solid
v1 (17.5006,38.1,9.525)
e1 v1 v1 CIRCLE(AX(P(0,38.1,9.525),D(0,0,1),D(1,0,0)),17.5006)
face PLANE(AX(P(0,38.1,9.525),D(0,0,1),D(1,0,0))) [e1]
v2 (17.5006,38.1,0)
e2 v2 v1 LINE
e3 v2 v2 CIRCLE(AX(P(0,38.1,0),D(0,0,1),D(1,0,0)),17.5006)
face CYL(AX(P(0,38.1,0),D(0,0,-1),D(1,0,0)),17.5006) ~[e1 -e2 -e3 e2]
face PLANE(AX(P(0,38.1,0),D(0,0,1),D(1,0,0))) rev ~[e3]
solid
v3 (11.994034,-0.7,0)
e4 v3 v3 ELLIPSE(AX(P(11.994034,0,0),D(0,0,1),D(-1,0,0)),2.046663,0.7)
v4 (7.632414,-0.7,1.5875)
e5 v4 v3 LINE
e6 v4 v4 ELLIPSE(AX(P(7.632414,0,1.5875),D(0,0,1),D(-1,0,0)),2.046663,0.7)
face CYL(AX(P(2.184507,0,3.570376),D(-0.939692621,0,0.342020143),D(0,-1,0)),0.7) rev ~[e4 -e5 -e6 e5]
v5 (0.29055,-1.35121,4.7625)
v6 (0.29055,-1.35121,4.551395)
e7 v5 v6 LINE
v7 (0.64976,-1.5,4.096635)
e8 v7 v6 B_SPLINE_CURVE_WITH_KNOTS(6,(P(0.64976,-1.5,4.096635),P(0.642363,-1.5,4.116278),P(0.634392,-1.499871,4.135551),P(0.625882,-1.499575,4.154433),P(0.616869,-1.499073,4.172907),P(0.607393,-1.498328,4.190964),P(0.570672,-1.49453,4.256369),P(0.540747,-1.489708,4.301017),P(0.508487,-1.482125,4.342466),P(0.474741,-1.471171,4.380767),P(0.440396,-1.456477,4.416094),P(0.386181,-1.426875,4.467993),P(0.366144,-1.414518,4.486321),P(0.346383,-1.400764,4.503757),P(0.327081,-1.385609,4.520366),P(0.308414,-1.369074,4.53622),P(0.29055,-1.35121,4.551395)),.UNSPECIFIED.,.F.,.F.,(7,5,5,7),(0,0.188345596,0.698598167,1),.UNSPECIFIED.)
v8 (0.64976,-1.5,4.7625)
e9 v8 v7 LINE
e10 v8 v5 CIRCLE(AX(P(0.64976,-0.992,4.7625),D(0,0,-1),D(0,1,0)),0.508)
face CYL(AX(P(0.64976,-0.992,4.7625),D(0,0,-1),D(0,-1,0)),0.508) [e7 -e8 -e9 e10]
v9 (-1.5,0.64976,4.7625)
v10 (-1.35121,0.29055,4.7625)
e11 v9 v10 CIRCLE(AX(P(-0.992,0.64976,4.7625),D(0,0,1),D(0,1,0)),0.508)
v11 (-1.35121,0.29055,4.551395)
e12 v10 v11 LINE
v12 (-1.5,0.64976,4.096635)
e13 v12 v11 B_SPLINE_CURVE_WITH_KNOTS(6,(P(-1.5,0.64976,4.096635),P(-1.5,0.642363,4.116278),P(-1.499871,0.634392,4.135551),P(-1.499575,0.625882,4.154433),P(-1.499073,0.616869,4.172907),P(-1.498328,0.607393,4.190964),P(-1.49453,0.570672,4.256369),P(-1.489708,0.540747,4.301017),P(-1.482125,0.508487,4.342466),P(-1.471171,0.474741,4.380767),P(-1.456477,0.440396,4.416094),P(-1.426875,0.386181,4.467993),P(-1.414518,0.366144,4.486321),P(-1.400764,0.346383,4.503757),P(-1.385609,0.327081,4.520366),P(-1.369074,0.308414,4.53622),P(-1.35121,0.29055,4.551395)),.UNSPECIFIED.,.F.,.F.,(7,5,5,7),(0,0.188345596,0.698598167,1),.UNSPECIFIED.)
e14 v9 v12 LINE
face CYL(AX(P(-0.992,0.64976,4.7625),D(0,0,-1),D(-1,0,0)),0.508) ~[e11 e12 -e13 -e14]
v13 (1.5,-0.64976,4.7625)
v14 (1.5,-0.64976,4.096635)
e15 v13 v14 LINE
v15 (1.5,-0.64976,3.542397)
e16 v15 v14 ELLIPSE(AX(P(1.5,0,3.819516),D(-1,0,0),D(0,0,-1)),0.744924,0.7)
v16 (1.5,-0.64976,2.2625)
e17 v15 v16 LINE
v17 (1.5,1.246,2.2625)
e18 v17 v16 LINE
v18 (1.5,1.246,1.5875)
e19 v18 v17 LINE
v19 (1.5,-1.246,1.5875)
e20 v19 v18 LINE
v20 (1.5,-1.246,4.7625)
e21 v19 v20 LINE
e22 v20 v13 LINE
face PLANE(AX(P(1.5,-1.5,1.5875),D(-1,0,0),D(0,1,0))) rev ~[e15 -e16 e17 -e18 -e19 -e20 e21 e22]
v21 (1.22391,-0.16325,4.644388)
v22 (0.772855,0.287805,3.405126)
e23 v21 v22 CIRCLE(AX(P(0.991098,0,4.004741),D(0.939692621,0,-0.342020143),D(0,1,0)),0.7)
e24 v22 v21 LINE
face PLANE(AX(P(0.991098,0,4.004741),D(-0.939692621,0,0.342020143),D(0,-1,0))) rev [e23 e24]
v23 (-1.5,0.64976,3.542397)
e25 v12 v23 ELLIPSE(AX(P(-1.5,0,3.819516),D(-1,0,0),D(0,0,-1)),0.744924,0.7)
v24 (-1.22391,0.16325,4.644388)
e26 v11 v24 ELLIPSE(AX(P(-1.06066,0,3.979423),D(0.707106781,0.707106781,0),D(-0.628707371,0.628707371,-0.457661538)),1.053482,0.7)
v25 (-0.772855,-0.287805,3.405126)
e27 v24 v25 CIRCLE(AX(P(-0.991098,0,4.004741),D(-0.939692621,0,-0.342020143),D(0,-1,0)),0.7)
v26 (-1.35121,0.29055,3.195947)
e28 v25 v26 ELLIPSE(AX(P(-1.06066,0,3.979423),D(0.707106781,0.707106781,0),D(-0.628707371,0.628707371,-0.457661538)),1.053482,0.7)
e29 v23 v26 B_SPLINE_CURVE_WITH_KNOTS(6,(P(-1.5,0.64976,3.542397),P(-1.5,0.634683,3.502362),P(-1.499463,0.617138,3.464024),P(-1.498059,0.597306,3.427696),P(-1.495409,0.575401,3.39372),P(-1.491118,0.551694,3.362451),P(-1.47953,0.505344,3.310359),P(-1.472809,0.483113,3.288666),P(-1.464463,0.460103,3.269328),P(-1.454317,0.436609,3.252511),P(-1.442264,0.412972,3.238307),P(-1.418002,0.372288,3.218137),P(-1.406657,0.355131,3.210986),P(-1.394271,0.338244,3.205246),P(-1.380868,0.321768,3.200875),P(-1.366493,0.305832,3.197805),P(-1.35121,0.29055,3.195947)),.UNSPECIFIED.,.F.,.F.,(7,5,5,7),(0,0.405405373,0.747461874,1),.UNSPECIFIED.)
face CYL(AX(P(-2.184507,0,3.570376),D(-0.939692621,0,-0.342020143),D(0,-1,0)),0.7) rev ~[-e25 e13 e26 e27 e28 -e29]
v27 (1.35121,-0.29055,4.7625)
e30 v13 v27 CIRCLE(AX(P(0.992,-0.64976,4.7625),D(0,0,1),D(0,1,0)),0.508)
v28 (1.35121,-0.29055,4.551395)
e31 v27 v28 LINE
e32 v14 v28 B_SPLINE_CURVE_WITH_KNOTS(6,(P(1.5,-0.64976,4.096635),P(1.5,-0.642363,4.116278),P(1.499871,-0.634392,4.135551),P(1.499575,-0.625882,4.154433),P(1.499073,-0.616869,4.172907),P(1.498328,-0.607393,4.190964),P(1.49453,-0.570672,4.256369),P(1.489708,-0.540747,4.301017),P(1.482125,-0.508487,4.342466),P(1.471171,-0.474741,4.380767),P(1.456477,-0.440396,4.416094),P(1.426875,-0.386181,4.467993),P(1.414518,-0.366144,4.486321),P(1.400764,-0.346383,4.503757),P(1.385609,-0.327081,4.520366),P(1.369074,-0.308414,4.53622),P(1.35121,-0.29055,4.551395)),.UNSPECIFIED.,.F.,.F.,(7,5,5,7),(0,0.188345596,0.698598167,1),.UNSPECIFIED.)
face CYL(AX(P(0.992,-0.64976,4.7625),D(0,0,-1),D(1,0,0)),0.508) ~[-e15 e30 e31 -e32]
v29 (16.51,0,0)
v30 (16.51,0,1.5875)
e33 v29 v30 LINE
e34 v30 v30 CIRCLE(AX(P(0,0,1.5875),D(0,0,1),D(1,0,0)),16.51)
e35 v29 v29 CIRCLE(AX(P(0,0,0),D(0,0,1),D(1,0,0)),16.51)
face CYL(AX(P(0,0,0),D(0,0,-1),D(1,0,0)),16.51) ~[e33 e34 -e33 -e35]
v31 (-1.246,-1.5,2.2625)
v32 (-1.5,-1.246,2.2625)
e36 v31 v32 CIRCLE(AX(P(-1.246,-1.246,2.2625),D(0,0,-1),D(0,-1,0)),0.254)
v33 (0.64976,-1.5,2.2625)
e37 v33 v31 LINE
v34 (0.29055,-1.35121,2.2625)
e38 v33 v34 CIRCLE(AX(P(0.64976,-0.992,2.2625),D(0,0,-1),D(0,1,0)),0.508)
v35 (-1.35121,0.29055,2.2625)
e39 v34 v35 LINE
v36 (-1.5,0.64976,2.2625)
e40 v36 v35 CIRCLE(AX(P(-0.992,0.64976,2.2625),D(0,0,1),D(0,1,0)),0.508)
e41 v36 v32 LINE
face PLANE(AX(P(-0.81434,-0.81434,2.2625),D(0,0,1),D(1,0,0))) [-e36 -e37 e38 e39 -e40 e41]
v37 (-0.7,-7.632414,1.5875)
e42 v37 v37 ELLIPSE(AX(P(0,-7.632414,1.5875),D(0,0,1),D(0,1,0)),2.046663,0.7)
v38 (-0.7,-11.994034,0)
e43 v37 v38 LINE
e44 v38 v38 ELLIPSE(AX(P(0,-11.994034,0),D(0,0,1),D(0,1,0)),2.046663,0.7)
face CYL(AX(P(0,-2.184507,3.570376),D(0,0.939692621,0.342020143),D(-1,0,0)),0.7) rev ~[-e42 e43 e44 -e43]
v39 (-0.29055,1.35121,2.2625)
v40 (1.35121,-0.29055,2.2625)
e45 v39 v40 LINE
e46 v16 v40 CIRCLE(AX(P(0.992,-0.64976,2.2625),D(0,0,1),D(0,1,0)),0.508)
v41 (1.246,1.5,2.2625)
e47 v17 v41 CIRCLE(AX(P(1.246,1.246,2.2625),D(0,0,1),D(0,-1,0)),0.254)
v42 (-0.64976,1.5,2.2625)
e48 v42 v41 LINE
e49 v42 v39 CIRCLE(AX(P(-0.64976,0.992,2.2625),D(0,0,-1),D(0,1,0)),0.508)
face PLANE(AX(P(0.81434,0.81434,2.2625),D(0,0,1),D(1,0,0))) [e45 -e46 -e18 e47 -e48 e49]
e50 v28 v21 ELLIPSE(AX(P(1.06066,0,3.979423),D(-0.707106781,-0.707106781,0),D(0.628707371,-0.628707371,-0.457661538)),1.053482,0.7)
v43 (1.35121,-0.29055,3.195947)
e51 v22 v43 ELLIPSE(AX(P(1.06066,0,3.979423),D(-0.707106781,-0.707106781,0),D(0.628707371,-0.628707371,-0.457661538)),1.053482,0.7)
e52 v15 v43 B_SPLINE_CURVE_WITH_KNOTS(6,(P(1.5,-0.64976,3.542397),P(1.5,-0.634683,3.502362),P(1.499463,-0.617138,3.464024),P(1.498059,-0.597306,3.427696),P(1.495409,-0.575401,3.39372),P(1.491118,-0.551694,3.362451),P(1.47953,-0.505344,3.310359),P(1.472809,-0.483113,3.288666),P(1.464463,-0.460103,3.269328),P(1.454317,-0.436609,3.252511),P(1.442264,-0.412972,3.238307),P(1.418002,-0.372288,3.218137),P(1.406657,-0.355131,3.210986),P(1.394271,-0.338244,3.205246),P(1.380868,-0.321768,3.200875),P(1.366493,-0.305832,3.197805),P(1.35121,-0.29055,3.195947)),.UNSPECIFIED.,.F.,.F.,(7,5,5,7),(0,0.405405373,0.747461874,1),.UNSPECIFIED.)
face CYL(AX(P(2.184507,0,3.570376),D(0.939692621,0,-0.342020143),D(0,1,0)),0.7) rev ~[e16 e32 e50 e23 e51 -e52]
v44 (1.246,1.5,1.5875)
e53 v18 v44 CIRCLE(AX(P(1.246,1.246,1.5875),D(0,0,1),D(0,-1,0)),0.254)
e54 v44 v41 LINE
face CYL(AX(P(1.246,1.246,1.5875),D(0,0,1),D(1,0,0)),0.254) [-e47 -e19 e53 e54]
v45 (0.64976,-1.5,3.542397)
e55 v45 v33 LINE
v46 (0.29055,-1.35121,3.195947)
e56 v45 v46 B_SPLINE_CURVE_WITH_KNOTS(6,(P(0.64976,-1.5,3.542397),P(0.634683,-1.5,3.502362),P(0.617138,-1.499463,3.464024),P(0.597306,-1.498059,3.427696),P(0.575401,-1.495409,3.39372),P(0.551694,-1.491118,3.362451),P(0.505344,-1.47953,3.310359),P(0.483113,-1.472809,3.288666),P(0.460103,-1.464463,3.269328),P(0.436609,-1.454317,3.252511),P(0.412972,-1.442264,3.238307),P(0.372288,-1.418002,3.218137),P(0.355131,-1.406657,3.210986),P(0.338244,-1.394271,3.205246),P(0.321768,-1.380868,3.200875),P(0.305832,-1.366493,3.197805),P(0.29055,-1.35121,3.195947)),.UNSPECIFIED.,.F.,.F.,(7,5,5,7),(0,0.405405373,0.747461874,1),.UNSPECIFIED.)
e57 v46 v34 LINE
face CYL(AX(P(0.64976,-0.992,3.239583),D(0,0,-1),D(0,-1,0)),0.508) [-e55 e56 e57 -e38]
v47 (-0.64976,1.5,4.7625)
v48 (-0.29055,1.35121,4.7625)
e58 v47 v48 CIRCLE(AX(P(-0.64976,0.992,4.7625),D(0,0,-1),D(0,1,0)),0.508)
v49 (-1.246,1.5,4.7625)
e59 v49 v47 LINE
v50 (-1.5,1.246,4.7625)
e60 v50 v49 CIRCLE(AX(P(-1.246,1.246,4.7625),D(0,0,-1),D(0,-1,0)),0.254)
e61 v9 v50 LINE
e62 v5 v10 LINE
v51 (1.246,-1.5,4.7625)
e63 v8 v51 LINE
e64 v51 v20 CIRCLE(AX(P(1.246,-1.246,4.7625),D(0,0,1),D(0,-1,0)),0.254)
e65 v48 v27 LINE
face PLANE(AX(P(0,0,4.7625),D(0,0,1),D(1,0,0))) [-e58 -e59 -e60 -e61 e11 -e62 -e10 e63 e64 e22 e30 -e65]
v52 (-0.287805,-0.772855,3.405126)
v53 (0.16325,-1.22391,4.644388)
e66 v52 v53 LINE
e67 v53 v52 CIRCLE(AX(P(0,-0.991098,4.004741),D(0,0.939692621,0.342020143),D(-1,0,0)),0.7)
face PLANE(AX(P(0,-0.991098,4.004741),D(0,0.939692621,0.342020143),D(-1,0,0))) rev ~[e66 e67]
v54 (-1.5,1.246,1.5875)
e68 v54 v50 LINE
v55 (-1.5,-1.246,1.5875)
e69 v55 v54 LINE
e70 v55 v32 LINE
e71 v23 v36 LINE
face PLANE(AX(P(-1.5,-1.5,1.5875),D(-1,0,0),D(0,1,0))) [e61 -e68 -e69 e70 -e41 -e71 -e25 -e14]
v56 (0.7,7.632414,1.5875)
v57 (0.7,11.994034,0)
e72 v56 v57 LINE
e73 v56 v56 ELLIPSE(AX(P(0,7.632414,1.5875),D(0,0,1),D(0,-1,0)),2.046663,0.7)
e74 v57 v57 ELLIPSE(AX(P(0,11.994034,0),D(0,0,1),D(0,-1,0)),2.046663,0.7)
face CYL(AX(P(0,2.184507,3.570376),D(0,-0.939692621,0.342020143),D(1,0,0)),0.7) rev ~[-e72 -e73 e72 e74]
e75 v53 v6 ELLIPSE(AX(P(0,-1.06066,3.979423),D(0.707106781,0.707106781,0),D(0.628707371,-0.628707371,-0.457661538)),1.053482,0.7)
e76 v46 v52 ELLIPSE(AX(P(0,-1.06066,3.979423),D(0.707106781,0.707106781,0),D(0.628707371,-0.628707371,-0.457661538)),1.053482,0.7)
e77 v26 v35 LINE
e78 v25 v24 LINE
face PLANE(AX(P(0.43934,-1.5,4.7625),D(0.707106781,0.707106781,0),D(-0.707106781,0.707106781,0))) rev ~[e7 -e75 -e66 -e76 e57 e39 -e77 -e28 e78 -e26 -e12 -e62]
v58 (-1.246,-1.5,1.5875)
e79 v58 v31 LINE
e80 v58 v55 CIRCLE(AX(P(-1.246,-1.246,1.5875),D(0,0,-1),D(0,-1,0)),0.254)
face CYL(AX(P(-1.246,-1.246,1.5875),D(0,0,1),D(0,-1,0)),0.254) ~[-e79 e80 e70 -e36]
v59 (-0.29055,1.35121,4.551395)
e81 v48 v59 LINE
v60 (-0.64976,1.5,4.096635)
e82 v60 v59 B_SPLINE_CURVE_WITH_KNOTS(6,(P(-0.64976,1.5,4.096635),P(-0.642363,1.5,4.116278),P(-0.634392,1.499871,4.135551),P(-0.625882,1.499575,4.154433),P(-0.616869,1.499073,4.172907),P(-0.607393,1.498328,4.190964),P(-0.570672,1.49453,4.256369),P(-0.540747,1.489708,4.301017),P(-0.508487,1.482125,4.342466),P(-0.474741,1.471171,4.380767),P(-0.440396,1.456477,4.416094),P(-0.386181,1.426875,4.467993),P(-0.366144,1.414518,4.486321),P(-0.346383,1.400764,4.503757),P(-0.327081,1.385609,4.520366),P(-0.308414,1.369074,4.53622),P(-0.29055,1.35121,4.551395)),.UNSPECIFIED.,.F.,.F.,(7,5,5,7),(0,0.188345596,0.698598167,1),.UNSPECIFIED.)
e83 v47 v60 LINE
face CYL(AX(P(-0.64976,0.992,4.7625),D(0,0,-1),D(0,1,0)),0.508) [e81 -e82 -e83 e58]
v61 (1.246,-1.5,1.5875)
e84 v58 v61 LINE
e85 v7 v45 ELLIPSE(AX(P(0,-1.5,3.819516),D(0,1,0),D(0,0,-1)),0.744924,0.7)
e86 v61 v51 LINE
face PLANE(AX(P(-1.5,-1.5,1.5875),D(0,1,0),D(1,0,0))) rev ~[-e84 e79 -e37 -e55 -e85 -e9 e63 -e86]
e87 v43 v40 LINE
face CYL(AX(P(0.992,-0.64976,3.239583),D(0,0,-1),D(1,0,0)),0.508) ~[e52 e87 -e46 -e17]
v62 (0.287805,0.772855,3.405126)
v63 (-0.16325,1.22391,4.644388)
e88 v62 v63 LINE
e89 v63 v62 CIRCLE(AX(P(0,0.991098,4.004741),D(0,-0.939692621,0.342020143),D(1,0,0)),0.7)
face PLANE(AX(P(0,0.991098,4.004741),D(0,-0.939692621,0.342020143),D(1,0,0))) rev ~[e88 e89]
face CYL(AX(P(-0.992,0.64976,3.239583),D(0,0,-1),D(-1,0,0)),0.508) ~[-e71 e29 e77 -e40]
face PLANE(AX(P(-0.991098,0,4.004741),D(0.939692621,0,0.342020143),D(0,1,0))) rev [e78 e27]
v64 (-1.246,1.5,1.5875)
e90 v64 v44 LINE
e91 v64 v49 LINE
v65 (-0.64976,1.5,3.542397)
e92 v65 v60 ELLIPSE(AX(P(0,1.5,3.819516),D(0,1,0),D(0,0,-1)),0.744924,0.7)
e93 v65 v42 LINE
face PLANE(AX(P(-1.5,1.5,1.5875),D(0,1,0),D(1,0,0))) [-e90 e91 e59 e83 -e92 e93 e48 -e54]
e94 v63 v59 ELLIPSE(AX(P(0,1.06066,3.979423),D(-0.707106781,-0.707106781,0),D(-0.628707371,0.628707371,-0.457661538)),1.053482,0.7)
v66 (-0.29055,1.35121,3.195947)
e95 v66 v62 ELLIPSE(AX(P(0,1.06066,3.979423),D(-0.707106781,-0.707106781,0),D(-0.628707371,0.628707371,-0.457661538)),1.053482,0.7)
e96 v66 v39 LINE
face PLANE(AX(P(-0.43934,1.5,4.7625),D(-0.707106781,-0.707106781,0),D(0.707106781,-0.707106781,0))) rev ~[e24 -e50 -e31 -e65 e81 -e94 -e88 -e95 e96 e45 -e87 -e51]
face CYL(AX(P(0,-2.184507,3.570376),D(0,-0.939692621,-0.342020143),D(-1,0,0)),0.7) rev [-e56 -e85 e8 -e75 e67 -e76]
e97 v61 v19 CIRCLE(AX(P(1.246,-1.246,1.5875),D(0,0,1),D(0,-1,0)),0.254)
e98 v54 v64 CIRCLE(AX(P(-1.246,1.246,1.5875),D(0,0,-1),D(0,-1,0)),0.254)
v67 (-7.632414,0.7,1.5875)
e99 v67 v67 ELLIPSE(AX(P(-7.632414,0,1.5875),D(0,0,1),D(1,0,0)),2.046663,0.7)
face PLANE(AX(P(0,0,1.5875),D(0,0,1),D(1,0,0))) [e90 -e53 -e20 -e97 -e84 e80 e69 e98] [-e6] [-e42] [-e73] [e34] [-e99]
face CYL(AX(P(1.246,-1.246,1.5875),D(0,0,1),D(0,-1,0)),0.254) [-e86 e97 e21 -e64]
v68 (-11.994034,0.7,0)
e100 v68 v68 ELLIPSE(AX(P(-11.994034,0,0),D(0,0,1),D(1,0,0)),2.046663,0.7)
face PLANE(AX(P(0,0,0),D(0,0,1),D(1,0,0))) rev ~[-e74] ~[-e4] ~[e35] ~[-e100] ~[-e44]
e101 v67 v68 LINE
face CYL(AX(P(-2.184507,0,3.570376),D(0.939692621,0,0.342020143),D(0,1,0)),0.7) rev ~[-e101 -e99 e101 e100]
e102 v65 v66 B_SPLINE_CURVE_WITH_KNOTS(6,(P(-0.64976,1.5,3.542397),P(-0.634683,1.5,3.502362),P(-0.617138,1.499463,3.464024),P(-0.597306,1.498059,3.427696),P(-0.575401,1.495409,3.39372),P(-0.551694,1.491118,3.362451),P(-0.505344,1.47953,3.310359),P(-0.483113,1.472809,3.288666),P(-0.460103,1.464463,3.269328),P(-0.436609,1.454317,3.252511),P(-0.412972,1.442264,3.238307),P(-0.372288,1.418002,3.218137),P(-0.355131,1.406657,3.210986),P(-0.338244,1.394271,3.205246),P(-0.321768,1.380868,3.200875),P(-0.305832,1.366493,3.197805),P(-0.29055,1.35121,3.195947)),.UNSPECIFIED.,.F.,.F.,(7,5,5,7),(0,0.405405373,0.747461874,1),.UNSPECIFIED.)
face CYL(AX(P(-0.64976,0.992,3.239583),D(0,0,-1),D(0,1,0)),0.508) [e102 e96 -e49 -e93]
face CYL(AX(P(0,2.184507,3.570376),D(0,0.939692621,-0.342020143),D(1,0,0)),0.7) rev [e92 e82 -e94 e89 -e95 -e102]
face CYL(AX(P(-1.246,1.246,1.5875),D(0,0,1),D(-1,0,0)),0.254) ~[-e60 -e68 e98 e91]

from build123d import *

# Parameters (mm, degrees)
F0_R              = 16.51
F1_DEPTH          = 1.5875
F2_W              = 3
F2_H              = 3
F3_DEPTH          = 3.175
F9_DEPTH          = 2.5
F10_R             = 17.5006
F11_DEPTH         = 9.525
F16_R             = 0.7
F17_DEPTH         = 1.27
F17_COPIES2_COUNT = 2
F18_DEPTH         = 25.4
F18_COPIES_COUNT  = 4
F19_R             = 0.254
F20_R             = 0.508


# Not quite as in the source:
# - a length typed as a fraction of an inch, garbled in the dataset ("3 / 203.2 mm" for 3/8 in), is restored
# - a pattern or mirror of a feature is missing from the dataset's text; its kind, count and spacing are read off the source's solid


with BuildPart() as f1:
    # F0 (on Top) → F1 (new body)
    with BuildSketch(Plane.XY):
        Circle(F0_R)
    extrude(amount=F1_DEPTH)

    # F2 (on face) → F3 (join)
    with BuildSketch(Plane.XY.offset(1.5875)):
        Rectangle(F2_W, F2_H)
    extrude(amount=F3_DEPTH)

    # F8 (on face) → F9 (cut)
    with BuildSketch(Plane.XY.offset(4.7625)):
        Polygon((-0.4393398282, 1.5), (1.5, -0.4393398282), (1.5, 1.5), align=None)
        Polygon((-1.5, -1.5), (0.4393398282, -1.5), (-1.5, 0.4393398282), align=None)
    extrude(amount=-F9_DEPTH, mode=Mode.SUBTRACT)


with BuildPart() as f11:
    # F10 (on Top) → F11 (new body)
    with BuildSketch(Plane.XY):
        with Locations((0, 38.1)):
            Circle(F10_R)
    extrude(amount=F11_DEPTH)

    # F12: cut F1
    add(f1.part, mode=Mode.SUBTRACT)


with BuildPart() as f1_1:
    add(f1.part)

    # F16 (on offset) → F17 (cut)
    with BuildSketch(Plane(origin=(0, -0.7814718533, -0.2844324935), x_dir=(-1, 0, 0), z_dir=(0, 0.9396926208, 0.3420201433))):
        with Locations((0, 4.102201201)):
            Circle(F16_R)
    f17 = extrude(amount=F17_DEPTH, mode=Mode.SUBTRACT)

    # F17_copies: F17 across plane
    add(f17.mirror(Plane(origin=(0, 0, 0), x_dir=(0.7071067812, 0.7071067812, 0), z_dir=(-0.7071067812, 0.7071067812, 0))), mode=Mode.SUBTRACT)

    # F17_copies1: F17 across plane
    add(f17.mirror(Plane(origin=(0, 0, 0), x_dir=(0.7071067812, -0.7071067812, 0), z_dir=(0.7071067812, 0.7071067812, 0))), mode=Mode.SUBTRACT)

    # F17_copies2: F17 ×2 about axis
    f17_copies2_axis = Axis((0, 0, 0), (0, 0, 1))
    for i in range(1, F17_COPIES2_COUNT):
        add(f17.rotate(f17_copies2_axis, i * 360 / F17_COPIES2_COUNT), mode=Mode.SUBTRACT)

    # F16 (on offset) → F18 (cut)
    with BuildSketch(Plane(origin=(0, -0.7814718533, -0.2844324935), x_dir=(-1, 0, 0), z_dir=(0, 0.9396926208, 0.3420201433))):
        with Locations((0, 4.102201201)):
            Circle(F16_R)
    f18 = extrude(amount=-F18_DEPTH, mode=Mode.SUBTRACT)

    # F18_copies: F18 ×4 about axis
    f18_copies_axis = Axis((0, 0, 0), (0, 0, 1))
    for i in range(1, F18_COPIES_COUNT):
        add(f18.rotate(f18_copies_axis, i * 360 / F18_COPIES_COUNT), mode=Mode.SUBTRACT)

    # F19
    f19_edges = [f1_1.edges().sort_by_distance(p)[0] for p in [
        (1.5, -1.5, 3.175),
        (-1.5, 1.5, 3.175),
        (1.5, 1.5, 1.925),
        (-1.5, -1.5, 1.925),
    ]]
    fillet(f19_edges, radius=F19_R)

    # F20
    f20_edges = [f1_1.edges().sort_by_distance(p)[0] for p in [
        (1.5, -0.43934, 2.751041),
        (1.5, -0.43934, 4.580975),
        (-0.43934, 1.5, 4.580975),
        (-0.43934, 1.5, 2.751041),
        (-1.5, 0.43934, 2.751041),
        (-1.5, 0.43934, 4.580975),
        (0.43934, -1.5, 2.751041),
        (0.43934, -1.5, 4.580975),
    ]]
    fillet(f20_edges, radius=F20_R)


solid = Compound([f11.part, f1_1.part])
